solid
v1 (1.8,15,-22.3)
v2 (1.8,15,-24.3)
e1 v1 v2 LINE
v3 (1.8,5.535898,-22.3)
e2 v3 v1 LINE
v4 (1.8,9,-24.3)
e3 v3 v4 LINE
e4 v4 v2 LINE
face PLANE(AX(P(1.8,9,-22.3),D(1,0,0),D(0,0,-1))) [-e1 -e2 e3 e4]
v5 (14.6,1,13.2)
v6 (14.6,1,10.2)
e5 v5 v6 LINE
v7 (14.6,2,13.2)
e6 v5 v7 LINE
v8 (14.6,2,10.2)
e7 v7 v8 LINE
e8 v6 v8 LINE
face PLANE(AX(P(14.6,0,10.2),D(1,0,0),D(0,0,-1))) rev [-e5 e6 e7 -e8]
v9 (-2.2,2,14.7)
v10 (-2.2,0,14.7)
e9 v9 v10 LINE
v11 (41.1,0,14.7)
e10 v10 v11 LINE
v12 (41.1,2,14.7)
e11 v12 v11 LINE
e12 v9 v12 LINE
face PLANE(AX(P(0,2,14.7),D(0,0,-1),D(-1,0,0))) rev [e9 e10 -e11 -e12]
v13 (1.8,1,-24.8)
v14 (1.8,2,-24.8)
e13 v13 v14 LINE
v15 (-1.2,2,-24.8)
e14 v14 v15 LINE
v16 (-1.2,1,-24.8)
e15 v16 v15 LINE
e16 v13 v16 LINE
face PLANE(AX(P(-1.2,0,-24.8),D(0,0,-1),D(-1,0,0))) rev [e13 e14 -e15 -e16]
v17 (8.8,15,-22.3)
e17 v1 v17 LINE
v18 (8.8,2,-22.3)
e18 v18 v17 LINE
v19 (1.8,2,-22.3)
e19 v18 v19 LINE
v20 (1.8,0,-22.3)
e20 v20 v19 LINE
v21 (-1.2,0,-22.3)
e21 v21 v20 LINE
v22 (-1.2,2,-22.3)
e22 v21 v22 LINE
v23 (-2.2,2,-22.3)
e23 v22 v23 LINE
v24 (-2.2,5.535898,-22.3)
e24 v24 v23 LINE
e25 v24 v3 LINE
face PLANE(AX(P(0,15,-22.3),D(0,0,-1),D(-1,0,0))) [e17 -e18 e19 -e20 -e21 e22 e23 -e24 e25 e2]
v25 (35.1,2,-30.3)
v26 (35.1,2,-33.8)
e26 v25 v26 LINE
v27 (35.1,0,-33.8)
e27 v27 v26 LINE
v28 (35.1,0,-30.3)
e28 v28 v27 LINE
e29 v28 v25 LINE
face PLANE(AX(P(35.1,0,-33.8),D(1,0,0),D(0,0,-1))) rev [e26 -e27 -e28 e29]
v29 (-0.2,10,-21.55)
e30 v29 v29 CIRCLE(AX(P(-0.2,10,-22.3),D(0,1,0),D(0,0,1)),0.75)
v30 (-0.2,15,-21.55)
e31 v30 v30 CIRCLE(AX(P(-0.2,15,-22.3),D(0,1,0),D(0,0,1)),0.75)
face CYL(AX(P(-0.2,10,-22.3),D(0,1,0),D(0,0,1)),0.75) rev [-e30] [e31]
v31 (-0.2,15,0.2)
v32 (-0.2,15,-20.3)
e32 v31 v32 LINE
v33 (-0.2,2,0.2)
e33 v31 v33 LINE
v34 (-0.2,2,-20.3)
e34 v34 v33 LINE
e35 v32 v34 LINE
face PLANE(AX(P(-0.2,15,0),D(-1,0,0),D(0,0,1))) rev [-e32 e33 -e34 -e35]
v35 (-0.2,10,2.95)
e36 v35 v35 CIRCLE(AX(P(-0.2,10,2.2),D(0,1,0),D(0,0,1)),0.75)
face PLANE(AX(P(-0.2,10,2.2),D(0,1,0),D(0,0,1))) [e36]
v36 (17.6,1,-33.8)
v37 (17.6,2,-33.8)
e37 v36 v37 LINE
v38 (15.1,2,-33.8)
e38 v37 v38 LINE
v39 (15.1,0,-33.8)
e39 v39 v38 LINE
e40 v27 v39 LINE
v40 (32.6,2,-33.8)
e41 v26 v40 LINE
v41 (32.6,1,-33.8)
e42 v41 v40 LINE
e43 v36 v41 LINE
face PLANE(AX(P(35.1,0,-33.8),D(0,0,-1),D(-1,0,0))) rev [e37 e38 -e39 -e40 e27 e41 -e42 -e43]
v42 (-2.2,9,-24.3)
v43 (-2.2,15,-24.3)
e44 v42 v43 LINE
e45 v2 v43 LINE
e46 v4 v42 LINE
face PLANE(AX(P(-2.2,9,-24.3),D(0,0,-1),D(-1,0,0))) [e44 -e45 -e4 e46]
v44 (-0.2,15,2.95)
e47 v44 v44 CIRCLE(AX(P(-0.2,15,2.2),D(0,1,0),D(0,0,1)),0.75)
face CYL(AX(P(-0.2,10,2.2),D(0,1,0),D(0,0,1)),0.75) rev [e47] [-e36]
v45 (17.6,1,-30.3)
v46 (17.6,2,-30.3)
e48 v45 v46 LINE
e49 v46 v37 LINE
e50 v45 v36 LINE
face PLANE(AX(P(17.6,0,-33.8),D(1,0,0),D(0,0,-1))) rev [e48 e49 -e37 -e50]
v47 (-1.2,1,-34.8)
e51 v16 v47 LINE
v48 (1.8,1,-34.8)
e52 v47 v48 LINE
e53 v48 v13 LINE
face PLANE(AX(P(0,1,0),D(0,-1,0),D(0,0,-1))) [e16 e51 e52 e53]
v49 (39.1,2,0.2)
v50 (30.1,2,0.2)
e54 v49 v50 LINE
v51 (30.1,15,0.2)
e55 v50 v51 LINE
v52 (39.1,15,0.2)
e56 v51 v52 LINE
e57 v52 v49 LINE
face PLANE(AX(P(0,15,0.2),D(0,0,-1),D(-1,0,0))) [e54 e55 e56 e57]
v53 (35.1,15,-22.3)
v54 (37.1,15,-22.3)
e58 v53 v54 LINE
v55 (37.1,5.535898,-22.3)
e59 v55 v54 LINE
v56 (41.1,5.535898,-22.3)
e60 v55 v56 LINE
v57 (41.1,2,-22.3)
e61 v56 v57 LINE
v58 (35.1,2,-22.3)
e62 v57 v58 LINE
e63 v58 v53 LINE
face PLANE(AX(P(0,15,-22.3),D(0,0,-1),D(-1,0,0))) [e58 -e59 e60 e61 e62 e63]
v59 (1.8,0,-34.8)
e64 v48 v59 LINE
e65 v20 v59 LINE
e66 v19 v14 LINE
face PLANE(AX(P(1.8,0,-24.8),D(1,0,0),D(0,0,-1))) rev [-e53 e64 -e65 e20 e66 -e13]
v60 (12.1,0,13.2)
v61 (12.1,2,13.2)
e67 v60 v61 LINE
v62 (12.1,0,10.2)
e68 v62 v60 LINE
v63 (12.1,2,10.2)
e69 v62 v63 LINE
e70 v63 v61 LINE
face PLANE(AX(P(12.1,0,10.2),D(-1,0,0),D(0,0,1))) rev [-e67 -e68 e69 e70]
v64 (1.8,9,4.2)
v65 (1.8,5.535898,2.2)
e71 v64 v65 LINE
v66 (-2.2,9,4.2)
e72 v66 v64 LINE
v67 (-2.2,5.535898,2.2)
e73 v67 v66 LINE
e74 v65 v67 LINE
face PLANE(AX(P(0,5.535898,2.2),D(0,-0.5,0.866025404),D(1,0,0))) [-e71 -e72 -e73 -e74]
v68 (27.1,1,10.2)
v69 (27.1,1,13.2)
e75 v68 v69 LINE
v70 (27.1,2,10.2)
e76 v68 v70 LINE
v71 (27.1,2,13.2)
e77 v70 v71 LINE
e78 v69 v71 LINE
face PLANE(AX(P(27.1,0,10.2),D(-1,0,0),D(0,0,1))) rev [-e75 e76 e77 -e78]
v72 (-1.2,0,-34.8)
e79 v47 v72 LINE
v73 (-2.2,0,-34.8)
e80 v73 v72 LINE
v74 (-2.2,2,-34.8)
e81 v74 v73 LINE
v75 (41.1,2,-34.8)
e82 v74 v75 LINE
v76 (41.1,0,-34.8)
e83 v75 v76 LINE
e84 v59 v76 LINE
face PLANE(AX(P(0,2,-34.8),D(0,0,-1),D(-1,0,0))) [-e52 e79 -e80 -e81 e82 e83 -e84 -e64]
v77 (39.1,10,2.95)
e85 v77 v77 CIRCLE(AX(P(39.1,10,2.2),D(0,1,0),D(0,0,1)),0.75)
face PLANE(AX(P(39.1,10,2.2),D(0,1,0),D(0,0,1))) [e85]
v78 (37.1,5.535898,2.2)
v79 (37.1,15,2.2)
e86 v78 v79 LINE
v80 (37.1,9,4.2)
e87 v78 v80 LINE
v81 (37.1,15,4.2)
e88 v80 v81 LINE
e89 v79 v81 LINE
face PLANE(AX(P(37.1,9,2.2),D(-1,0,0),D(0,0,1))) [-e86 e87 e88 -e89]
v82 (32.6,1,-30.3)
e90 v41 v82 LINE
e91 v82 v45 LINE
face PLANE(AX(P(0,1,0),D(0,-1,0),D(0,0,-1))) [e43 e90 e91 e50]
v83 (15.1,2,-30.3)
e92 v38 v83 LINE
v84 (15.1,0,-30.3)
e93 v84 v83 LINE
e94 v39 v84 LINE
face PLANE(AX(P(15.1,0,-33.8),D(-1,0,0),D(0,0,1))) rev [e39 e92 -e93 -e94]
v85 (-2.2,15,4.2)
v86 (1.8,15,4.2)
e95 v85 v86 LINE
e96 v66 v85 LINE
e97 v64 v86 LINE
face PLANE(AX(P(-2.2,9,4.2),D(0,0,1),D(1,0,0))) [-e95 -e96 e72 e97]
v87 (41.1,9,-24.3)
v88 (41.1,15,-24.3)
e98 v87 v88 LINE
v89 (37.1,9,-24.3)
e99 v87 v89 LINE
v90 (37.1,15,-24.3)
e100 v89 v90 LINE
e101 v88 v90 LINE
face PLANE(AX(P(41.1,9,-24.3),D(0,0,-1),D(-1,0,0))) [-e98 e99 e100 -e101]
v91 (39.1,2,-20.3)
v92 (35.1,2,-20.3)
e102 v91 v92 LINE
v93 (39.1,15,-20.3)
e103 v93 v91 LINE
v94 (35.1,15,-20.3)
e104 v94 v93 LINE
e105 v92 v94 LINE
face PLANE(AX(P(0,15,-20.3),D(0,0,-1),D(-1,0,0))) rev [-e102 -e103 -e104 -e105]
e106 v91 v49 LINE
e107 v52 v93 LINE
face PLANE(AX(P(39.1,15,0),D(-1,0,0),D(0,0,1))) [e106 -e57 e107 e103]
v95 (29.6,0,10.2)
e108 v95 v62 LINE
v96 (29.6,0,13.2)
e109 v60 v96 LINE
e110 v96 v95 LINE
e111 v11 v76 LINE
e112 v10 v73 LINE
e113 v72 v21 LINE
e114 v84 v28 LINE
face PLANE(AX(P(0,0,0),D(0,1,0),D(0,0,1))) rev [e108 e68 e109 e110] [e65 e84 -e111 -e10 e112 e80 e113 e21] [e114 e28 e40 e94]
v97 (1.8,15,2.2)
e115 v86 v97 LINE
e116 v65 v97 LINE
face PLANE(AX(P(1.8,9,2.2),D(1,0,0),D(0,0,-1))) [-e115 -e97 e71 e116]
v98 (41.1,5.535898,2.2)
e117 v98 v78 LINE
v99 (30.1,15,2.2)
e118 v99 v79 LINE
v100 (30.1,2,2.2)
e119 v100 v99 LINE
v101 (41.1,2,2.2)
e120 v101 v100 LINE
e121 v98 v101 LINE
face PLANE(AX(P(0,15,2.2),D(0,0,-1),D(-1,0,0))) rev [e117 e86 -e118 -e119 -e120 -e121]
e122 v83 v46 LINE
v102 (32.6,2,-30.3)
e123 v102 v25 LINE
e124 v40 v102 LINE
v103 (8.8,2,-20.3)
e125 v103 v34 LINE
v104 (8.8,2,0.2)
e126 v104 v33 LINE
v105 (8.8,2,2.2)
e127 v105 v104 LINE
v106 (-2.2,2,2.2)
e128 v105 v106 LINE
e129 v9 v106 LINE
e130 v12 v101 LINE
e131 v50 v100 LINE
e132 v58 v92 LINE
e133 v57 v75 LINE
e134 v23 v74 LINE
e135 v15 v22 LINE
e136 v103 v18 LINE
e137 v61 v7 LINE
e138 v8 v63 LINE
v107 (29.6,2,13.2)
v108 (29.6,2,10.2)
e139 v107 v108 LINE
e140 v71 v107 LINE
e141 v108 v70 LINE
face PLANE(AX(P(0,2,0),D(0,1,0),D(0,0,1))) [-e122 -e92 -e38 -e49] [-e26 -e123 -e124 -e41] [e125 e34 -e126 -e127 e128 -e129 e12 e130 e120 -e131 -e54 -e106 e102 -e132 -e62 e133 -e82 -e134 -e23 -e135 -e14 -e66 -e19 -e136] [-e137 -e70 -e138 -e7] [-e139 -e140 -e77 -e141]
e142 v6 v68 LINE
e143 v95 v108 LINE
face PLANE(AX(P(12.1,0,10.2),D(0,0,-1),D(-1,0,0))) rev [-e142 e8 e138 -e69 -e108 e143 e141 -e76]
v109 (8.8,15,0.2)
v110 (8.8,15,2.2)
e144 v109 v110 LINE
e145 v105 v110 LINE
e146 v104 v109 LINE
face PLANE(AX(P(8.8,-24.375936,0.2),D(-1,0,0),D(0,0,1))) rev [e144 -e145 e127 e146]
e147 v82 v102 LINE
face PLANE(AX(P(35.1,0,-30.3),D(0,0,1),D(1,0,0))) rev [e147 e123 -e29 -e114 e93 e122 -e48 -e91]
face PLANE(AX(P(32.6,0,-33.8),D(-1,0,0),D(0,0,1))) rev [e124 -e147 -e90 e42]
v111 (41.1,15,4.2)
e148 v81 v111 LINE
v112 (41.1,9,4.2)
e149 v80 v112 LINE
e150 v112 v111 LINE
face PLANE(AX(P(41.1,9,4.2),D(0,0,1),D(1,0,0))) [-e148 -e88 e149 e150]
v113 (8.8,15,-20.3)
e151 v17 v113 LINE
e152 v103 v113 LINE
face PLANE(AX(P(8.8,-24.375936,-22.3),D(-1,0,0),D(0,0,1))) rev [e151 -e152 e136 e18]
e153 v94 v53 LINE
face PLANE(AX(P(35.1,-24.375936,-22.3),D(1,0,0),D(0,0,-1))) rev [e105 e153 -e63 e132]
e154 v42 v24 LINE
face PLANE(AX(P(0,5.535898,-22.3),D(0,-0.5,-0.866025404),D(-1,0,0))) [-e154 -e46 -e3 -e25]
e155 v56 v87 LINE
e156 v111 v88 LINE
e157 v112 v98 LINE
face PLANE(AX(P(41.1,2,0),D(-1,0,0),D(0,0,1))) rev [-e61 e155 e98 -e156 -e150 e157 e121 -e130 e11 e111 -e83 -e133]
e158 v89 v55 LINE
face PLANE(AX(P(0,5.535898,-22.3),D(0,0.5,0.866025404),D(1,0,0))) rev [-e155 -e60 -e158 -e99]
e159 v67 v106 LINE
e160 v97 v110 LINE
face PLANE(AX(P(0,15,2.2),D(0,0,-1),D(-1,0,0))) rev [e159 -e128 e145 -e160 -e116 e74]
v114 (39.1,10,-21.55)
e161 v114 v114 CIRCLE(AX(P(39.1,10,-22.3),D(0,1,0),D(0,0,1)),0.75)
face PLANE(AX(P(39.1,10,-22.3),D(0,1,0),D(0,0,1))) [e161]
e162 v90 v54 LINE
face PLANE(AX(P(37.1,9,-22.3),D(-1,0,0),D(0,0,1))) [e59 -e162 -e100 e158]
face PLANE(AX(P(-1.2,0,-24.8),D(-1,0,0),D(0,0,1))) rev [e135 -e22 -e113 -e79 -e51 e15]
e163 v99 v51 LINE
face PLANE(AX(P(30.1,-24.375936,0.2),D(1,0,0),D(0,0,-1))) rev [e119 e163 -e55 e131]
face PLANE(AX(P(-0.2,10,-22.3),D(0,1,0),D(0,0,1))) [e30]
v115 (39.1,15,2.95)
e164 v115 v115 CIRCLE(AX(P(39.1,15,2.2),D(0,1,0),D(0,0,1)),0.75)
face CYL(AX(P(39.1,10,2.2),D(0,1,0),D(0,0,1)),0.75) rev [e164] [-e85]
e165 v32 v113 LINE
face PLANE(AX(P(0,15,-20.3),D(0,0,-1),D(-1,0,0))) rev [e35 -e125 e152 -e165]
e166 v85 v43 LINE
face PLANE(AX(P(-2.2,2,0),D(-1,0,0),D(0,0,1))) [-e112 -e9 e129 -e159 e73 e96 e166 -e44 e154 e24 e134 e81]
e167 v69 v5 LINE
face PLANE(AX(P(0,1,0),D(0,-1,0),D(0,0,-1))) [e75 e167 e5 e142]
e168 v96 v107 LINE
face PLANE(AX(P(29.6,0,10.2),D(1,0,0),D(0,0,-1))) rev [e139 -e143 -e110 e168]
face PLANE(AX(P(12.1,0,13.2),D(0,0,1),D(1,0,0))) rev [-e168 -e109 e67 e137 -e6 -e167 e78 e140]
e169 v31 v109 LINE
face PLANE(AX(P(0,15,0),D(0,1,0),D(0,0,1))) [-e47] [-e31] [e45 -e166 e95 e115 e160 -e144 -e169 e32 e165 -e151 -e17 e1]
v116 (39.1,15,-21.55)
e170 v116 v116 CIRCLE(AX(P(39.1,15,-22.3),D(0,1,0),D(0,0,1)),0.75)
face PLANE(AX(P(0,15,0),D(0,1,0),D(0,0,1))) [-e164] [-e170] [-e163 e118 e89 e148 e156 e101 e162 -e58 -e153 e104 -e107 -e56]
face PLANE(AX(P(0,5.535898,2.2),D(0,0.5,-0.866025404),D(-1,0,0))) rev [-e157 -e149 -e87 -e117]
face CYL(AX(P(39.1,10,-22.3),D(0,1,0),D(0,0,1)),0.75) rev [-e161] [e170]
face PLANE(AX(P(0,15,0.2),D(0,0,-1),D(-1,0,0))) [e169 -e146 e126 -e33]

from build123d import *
from OCP.BRepFilletAPI import BRepFilletAPI_MakeChamfer

# Parameters (mm, degrees)
SKETCH1_W           = 43.3
SKETCH1_H           = 24.5
SKETCH1_W_2         = 39.3
SKETCH1_H_2         = 20.5
SKETCH1_H_3         = 12.5
BOSS_EXTRUDE1_DEPTH = 2
SKETCH1_3_W         = 43.3
SKETCH1_3_H         = 24.5
SKETCH1_3_W_2       = 39.3
SKETCH1_3_H_2       = 20.5
BOSS_EXTRUDE2_DEPTH = 15
SKETCH3_W           = 4
SKETCH3_H           = 2
BOSS_EXTRUDE4_DEPTH = 6
CHAMFER2_SIZE       = 3.464101615
CHAMFER2_SIZE_2     = 2
SKETCH4_R           = 0.75
CUT_EXTRUDE1_DEPTH  = 5
SKETCH5_W           = 26.3
SKETCH5_H           = 2
SKETCH5_W_2         = 21.3
CUT_EXTRUDE2_DEPTH  = 13
SKETCH7_W           = 2.5
SKETCH7_H           = 3.5
SKETCH7_H_2         = 3
CUT_EXTRUDE3_DEPTH  = 56.400812268
SKETCH8_W           = 15
SKETCH8_H           = 3.5
SKETCH8_W_2         = 12.5
SKETCH8_H_2         = 3
CUT_EXTRUDE4_DEPTH  = 1
SKETCH9_W           = 3
SKETCH9_H           = 2.5
CUT_EXTRUDE5_DEPTH  = 56.400812268
SKETCH10_W          = 3
SKETCH10_H          = 10
CUT_EXTRUDE6_DEPTH  = 1


with BuildPart() as part:
    # Sketch1 → Boss-Extrude1 (new body)
    # profile 1 of 4: a face of its own
    with BuildSketch(Plane(origin=(0, 0, 0), x_dir=(1, 0, 0), z_dir=(0, 1, 0))):
        with Locations((19.45, 10.05)):
            Rectangle(SKETCH1_W, SKETCH1_H)
        with Locations((19.45, 10.05)):
            Rectangle(SKETCH1_W_2, SKETCH1_H_2, mode=Mode.SUBTRACT)
    # profile 2 of 4: a face of its own
    with BuildSketch(Plane(origin=(0, 0, 0), x_dir=(1, 0, 0), z_dir=(0, 1, 0))):
        with Locations((19.45, 10.05)):
            Rectangle(SKETCH1_W_2, SKETCH1_H_2)
    # profile 3 of 4: a face of its own
    with BuildSketch(Plane(origin=(0, 0, 0), x_dir=(1, 0, 0), z_dir=(0, 1, 0))):
        with Locations((19.45, -8.45)):
            Rectangle(SKETCH1_W, SKETCH1_H_3)
    # profile 4 of 4: a face of its own
    with BuildSketch(Plane(origin=(0, 0, 0), x_dir=(1, 0, 0), z_dir=(0, 1, 0))):
        with Locations((19.45, 28.55)):
            Rectangle(SKETCH1_W, SKETCH1_H_3)
    extrude(amount=BOSS_EXTRUDE1_DEPTH)

    # Sketch1<3> → Boss-Extrude2 (add)
    with BuildSketch(Plane(origin=(0, 0, 0), x_dir=(1, 0, 0), z_dir=(0, 1, 0))):
        with Locations((19.45, 10.05)):
            Rectangle(SKETCH1_3_W, SKETCH1_3_H)
        with Locations((19.45, 10.05)):
            Rectangle(SKETCH1_3_W_2, SKETCH1_3_H_2, mode=Mode.SUBTRACT)
    extrude(amount=BOSS_EXTRUDE2_DEPTH)

    # Sketch3 → Boss-Extrude4 (add)
    with BuildSketch(Plane(origin=(0, 15, 0), x_dir=(1, 0, 0), z_dir=(0, 1, 0))):
        with Locations((-0.2, -3.2)):
            Rectangle(SKETCH3_W, SKETCH3_H)
        with Locations((39.1, -3.2)):
            Rectangle(SKETCH3_W, SKETCH3_H)
        with Locations((39.1, 23.3)):
            Rectangle(SKETCH3_W, SKETCH3_H)
        with Locations((-0.2, 23.3)):
            Rectangle(SKETCH3_W, SKETCH3_H)
    extrude(amount=-BOSS_EXTRUDE4_DEPTH)

    # Chamfer2
    chamfer2_edges_1 = [part.edges().sort_by_distance(p)[0] for p in [
        (-0.2, 9, -22.3),
    ]]
    chamfer2_side_1 = [part.faces().sort_by_distance(p)[0] for p in [
        (-0.2, 8.96, -22.3),
    ]]
    chamfer2_edges_2 = [part.edges().sort_by_distance(p)[0] for p in [
        (39.1, 9, -22.3),
    ]]
    chamfer2_side_2 = [part.faces().sort_by_distance(p)[0] for p in [
        (39.1, 9, -22.34),
    ]]
    chamfer2_edges_3 = [part.edges().sort_by_distance(p)[0] for p in [
        (39.1, 9, 2.2),
    ]]
    chamfer2_side_3 = [part.faces().sort_by_distance(p)[0] for p in [
        (39.1, 9, 2.24),
    ]]
    chamfer2_edges_4 = [part.edges().sort_by_distance(p)[0] for p in [
        (-0.2, 9, 2.2),
    ]]
    chamfer2_side_4 = [part.faces().sort_by_distance(p)[0] for p in [
        (-0.2, 9, 2.24),
    ]]
    chamfer2 = BRepFilletAPI_MakeChamfer(part.part.solid().wrapped)
    for e in chamfer2_edges_1:
        chamfer2.Add(CHAMFER2_SIZE - 0.0001, CHAMFER2_SIZE_2 - 0.0001, e.wrapped, chamfer2_side_1[0].wrapped)
    for e in chamfer2_edges_2:
        chamfer2.Add(CHAMFER2_SIZE_2 - 0.0001, CHAMFER2_SIZE - 0.0001, e.wrapped, chamfer2_side_2[0].wrapped)
    for e in chamfer2_edges_3:
        chamfer2.Add(CHAMFER2_SIZE_2 - 0.0001, CHAMFER2_SIZE - 0.0001, e.wrapped, chamfer2_side_3[0].wrapped)
    for e in chamfer2_edges_4:
        chamfer2.Add(CHAMFER2_SIZE_2 - 0.0001, CHAMFER2_SIZE - 0.0001, e.wrapped, chamfer2_side_4[0].wrapped)
    add(Compound.cast(chamfer2.Shape()), mode=Mode.REPLACE)  # a hair under: the kernel refuses the full size

    # Sketch4 → Cut-Extrude1 (cut)
    with BuildSketch(Plane(origin=(0, 15, 0), x_dir=(1, 0, 0), z_dir=(0, 1, 0))):
        with Locations(Location((-0.2, 22.3, 0), (0, 0, 270))):
            Circle(SKETCH4_R)
        with Locations(Location((-0.2, -2.2, 0), (0, 0, 270))):
            Circle(SKETCH4_R)
        with Locations(Location((39.1, -2.2, 0), (0, 0, 270))):
            Circle(SKETCH4_R)
        with Locations(Location((39.1, 22.3, 0), (0, 0, 270))):
            Circle(SKETCH4_R)
    extrude(amount=-CUT_EXTRUDE1_DEPTH, mode=Mode.SUBTRACT)

    # Sketch5 → Cut-Extrude2 (cut)
    with BuildSketch(Plane(origin=(0, 15, 0), x_dir=(1, 0, 0), z_dir=(0, 1, 0))):
        with Locations((21.95, 21.3)):
            Rectangle(SKETCH5_W, SKETCH5_H)
        with Locations((19.45, -1.2)):
            Rectangle(SKETCH5_W_2, SKETCH5_H)
    extrude(amount=-CUT_EXTRUDE2_DEPTH, mode=Mode.SUBTRACT)

    # Sketch7 → Cut-Extrude3 (cut, through all)
    with BuildSketch(Plane(origin=(0, 2, 0), x_dir=(1, 0, 0), z_dir=(0, 1, 0))):
        with Locations((16.35, 32.05)):
            Rectangle(SKETCH7_W, SKETCH7_H)
        with Locations((33.85, 32.05)):
            Rectangle(SKETCH7_W, SKETCH7_H)
        with Locations((13.35, -11.7)):
            Rectangle(SKETCH7_W, SKETCH7_H_2)
        with Locations((28.35, -11.7)):
            Rectangle(SKETCH7_W, SKETCH7_H_2)
    extrude(amount=-CUT_EXTRUDE3_DEPTH, mode=Mode.SUBTRACT)

    # Sketch8 → Cut-Extrude4 (cut)
    with BuildSketch(Plane.XZ):
        with Locations((25.1, -32.05)):
            Rectangle(SKETCH8_W, SKETCH8_H)
        with Locations((20.85, 11.7)):
            Rectangle(SKETCH8_W_2, SKETCH8_H_2)
    extrude(amount=-CUT_EXTRUDE4_DEPTH, mode=Mode.SUBTRACT)

    # Sketch9 → Cut-Extrude5 (cut, through all)
    with BuildSketch(Plane(origin=(0, 2, 0), x_dir=(1, 0, 0), z_dir=(0, 1, 0))):
        with Locations((0.3, 23.55)):
            Rectangle(SKETCH9_W, SKETCH9_H)
    extrude(amount=-CUT_EXTRUDE5_DEPTH, mode=Mode.SUBTRACT)

    # Sketch10 → Cut-Extrude6 (cut)
    with BuildSketch(Plane.XZ):
        with Locations((0.3, -29.8)):
            Rectangle(SKETCH10_W, SKETCH10_H)
    extrude(amount=-CUT_EXTRUDE6_DEPTH, mode=Mode.SUBTRACT)


solid = part.part
